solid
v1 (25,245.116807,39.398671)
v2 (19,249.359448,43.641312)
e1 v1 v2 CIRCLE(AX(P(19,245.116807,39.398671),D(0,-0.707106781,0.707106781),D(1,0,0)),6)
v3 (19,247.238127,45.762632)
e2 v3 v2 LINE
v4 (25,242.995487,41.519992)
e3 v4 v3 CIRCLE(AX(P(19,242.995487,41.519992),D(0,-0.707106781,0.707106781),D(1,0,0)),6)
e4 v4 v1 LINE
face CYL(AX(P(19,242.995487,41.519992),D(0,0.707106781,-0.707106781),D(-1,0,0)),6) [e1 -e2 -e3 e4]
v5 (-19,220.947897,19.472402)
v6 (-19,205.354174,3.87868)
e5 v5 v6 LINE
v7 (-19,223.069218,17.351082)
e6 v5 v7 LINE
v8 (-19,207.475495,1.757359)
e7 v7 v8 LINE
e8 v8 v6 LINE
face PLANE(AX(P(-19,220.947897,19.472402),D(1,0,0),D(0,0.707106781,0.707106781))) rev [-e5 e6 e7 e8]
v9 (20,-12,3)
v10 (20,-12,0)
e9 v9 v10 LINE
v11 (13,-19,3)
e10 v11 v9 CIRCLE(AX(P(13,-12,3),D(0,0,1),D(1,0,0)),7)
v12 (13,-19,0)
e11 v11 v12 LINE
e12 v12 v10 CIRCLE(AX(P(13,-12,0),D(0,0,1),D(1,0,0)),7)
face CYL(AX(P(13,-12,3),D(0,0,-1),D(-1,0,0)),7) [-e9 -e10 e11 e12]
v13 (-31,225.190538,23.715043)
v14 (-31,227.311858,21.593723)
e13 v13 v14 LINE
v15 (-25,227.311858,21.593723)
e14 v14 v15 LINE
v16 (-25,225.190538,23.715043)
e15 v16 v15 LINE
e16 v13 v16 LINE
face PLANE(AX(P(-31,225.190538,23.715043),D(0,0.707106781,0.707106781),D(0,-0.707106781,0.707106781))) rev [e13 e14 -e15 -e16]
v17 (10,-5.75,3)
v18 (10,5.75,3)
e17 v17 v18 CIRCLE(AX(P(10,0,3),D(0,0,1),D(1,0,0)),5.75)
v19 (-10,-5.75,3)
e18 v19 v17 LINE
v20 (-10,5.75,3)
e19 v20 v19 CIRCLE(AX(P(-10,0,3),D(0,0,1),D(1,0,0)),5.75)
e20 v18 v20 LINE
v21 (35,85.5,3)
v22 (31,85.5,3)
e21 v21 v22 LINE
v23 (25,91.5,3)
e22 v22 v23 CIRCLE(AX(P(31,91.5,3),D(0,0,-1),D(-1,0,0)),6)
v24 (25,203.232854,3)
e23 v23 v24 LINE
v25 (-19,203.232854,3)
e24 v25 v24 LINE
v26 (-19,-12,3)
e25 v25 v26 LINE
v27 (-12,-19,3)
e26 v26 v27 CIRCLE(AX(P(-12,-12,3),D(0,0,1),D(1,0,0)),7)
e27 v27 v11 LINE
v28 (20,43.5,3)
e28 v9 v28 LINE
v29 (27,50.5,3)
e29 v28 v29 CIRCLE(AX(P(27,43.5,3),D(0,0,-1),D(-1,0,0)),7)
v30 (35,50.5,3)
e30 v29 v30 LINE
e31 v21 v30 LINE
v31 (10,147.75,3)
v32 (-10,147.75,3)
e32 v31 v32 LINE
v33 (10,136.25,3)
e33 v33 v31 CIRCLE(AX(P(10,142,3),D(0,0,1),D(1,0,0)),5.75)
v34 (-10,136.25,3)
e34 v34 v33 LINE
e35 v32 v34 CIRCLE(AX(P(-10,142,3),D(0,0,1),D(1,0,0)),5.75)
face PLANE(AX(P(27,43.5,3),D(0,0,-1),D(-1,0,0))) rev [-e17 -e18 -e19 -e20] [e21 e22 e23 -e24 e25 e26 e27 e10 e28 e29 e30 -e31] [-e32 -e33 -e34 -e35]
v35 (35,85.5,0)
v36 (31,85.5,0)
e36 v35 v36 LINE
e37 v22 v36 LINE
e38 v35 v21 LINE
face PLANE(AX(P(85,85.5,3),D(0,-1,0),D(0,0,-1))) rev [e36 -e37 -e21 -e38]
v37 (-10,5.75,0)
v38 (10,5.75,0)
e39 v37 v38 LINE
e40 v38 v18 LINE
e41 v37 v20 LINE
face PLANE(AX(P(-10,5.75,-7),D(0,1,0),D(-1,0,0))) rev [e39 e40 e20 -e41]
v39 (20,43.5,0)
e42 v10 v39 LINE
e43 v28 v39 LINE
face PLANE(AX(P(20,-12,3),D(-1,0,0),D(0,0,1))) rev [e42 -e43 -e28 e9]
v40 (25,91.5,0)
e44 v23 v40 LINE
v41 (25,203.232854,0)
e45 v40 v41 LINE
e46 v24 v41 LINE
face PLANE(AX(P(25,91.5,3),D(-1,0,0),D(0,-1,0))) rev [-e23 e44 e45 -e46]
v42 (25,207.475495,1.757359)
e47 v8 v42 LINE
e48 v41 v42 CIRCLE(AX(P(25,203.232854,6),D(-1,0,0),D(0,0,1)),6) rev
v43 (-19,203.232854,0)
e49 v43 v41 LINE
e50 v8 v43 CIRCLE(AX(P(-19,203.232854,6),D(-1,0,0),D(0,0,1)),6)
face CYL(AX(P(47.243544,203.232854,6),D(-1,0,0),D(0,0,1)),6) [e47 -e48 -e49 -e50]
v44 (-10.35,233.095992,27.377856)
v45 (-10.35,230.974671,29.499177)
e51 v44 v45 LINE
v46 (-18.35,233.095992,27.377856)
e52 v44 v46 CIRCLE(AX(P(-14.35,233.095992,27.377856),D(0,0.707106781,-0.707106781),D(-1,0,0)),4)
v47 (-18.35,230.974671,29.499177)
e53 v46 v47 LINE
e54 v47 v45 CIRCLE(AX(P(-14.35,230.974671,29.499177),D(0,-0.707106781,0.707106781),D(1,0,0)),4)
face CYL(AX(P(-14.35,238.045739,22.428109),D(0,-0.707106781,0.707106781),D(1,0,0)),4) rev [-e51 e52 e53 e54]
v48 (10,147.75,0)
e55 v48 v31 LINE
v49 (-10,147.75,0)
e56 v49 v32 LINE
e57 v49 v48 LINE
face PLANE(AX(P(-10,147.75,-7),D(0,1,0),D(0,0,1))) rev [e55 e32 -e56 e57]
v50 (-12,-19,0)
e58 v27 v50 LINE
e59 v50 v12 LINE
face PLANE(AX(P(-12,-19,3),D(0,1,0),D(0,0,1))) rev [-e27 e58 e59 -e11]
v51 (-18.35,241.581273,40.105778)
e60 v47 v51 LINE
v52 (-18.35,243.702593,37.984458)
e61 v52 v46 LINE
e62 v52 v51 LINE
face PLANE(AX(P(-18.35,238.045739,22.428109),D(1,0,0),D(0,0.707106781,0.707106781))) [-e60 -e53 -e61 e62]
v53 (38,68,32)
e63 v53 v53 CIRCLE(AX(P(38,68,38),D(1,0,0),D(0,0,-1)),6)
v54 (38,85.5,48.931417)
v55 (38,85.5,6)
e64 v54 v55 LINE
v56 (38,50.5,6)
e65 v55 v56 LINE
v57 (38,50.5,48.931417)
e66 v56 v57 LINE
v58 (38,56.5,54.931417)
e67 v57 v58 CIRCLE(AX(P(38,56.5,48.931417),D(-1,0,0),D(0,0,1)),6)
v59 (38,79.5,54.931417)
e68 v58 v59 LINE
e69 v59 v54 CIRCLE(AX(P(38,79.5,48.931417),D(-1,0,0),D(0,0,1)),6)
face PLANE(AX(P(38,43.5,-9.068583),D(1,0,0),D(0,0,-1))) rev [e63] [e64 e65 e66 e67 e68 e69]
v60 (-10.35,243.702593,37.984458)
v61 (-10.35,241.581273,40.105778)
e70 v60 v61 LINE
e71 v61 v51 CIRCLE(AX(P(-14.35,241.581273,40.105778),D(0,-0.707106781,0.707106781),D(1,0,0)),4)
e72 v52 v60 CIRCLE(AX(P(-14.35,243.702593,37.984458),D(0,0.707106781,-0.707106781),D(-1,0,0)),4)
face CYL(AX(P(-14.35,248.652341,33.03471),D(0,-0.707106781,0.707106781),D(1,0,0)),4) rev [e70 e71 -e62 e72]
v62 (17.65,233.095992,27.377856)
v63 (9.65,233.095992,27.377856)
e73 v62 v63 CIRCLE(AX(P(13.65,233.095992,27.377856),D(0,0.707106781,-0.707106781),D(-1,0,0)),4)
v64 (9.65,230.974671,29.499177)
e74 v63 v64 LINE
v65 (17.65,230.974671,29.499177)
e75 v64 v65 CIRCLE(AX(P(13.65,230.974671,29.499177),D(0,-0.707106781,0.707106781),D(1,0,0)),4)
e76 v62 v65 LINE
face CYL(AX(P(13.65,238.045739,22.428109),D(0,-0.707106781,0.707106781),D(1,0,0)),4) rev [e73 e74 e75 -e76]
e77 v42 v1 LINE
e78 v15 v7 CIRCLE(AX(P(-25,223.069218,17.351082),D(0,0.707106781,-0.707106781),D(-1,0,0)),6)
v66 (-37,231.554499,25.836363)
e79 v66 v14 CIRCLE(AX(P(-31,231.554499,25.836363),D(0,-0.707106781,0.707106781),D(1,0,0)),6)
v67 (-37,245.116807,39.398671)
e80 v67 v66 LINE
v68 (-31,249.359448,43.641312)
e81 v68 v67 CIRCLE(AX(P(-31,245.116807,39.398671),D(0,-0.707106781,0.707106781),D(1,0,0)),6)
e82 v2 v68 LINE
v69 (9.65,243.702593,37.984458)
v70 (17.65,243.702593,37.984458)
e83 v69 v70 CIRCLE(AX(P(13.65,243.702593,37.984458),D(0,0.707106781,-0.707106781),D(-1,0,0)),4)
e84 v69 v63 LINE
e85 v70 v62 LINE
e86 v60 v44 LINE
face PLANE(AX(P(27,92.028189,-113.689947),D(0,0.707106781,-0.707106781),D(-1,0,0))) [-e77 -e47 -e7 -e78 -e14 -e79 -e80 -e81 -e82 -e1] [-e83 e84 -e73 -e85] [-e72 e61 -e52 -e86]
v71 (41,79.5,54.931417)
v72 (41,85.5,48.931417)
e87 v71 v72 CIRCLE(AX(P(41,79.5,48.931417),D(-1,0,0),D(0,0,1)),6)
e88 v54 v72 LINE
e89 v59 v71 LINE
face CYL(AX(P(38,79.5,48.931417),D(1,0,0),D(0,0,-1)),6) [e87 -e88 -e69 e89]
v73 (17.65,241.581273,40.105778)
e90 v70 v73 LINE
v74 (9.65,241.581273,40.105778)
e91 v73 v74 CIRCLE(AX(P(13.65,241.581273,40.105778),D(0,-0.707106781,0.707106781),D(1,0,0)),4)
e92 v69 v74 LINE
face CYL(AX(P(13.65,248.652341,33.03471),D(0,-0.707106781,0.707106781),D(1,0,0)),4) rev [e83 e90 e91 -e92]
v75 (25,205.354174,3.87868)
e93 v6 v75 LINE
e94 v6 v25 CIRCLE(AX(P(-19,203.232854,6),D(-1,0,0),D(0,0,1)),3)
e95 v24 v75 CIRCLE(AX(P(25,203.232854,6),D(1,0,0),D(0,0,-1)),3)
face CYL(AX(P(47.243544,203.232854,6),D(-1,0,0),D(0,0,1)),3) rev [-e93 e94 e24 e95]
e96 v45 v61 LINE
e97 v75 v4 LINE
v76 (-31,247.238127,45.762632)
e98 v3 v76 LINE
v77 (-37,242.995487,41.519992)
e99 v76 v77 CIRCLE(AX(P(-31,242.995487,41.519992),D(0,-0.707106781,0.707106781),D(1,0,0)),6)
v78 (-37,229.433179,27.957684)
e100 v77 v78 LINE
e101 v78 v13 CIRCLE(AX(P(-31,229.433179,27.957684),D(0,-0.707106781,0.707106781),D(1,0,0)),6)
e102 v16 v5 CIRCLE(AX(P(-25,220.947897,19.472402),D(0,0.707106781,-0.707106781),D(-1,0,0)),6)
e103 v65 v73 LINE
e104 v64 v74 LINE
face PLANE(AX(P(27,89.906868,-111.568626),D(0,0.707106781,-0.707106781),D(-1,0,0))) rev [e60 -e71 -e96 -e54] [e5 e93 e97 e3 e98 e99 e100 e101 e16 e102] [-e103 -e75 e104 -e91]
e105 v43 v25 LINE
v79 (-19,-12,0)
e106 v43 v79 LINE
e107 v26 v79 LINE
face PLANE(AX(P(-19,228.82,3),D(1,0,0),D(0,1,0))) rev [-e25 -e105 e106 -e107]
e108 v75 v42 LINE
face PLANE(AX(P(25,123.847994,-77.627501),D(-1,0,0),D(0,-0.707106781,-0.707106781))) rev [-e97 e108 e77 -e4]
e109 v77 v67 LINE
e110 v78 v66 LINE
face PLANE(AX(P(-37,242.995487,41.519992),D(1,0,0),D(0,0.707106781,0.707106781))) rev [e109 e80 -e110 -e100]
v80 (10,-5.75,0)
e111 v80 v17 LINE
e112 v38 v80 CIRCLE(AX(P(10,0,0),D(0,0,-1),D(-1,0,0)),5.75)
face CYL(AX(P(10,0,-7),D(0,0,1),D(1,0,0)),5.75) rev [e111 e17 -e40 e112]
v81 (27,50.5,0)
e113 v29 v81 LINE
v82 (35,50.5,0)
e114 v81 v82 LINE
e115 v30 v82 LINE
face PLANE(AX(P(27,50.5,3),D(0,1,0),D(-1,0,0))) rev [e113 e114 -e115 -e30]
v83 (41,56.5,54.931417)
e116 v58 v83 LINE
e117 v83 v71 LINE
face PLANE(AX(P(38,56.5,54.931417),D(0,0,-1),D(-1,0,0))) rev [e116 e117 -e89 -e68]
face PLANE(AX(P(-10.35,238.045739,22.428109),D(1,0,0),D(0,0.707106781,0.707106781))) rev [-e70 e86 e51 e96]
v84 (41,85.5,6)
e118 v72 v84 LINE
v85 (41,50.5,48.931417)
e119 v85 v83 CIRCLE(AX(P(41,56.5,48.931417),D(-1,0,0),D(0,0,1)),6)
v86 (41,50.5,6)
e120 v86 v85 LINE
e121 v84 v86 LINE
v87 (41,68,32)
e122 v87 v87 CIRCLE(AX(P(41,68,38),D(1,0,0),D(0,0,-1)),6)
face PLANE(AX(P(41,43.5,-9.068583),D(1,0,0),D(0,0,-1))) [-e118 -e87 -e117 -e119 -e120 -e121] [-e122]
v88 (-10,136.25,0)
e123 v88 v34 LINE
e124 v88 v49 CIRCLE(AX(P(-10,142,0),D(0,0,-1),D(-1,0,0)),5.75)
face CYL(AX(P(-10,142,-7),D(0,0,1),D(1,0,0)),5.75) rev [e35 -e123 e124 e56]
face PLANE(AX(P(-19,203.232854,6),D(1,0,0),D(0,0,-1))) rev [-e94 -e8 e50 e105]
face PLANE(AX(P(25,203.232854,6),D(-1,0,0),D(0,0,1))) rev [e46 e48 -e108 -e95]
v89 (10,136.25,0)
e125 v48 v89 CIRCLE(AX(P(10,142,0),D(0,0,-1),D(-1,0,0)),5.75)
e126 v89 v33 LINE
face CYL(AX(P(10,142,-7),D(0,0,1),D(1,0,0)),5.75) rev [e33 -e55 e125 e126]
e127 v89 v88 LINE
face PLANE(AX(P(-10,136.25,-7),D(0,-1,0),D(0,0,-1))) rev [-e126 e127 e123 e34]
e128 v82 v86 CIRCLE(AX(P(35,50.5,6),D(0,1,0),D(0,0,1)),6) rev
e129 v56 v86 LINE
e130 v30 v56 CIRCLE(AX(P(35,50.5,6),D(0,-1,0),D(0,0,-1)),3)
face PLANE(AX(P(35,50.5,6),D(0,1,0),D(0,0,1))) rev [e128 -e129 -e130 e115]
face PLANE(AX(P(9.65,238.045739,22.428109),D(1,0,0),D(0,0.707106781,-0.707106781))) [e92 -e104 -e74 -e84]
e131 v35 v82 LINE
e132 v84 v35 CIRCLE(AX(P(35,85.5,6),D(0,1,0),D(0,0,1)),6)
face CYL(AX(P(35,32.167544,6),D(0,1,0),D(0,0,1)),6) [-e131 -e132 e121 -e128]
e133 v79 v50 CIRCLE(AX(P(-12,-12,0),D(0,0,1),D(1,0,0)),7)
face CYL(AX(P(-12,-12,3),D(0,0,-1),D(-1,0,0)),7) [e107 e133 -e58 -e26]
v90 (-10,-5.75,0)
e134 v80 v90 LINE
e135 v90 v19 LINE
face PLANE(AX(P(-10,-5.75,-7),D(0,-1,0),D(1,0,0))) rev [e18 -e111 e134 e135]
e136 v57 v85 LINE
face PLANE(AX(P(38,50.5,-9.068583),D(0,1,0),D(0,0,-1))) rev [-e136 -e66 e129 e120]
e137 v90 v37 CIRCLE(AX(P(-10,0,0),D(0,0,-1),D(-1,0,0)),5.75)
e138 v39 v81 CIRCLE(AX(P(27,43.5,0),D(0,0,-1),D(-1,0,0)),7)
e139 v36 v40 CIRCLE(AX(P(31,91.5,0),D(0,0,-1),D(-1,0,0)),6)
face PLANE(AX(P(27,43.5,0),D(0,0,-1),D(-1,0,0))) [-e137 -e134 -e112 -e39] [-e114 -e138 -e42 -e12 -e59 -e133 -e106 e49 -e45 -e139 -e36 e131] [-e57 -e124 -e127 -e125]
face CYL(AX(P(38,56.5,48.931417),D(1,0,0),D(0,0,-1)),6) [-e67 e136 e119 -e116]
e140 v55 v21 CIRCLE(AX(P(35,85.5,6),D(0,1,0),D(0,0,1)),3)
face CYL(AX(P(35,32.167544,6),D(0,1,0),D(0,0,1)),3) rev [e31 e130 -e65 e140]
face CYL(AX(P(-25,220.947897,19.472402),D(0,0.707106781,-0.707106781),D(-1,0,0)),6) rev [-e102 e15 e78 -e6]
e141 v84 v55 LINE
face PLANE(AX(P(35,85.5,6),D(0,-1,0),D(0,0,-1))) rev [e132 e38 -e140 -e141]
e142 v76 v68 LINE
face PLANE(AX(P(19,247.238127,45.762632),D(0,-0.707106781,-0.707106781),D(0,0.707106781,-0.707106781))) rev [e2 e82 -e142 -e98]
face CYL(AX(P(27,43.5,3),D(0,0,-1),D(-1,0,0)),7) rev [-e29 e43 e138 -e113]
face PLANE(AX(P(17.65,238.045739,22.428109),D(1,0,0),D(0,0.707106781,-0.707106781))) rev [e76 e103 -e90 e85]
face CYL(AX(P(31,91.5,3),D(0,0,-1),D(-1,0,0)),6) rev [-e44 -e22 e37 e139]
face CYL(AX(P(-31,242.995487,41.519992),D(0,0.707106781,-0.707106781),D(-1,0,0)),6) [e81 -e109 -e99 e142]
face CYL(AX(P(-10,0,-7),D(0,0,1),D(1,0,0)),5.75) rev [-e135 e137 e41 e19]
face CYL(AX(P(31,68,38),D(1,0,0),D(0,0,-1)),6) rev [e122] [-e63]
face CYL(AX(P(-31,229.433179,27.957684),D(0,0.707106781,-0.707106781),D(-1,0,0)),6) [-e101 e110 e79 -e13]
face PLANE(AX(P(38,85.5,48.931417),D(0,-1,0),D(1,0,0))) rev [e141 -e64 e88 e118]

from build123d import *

# Parameters (mm, degrees)
BASE_FLANGE1_DEPTH     = 3
CUT_EXTRUDE1_DEPTH     = 10
SKETCHED_START         = 179.903820644
SKETCHED_BEND1_DEPTH   = 9.096179356
SKETCHED_START_2       = -37
SKETCHED_BEND1_2_DEPTH = 62
SKETCHED_START_3       = -19
SKETCHED_BEND1_3_DEPTH = 44
SKETCHED_START_4       = -10.35
SKETCHED_BEND1_4_DEPTH = 20
SKETCHED_START_5       = -31
SKETCHED_BEND1_5_DEPTH = 12.65
SKETCHED_START_6       = 17.65
SKETCHED_BEND1_6_DEPTH = 1.35
SKETCHED_START_7       = 142.46468863
SKETCHED_BEND1_7_DEPTH = 2.999999999
SKETCHED_START_8       = 50.5
SKETCHED_BEND2_DEPTH   = 35
SKETCHED_BEND2_2_DEPTH = 35
SKETCHED_START_9       = 31
SKETCHED_BEND2_3_DEPTH = 11
SKETCH9_R              = 6
CUT_EXTRUDE2_DEPTH     = 10
CUT_EXTRUDE3_DEPTH     = 10


with BuildPart() as part:
    # Base-Flange1: sheet metal written as solids
    # Sketch1 → Base-Flange1 (new body)
    with BuildSketch(Plane(origin=(0, 0, 0), x_dir=(0, 1, 0), z_dir=(0, 0, 1))):
        with BuildLine():
            Line((-19, 12), (-19, -13))
            ThreePointArc((-19, -13), (-16.949747468, -17.949747468), (-12, -20))
            Line((-12, -20), (43.5, -20))
            ThreePointArc((43.5, -20), (48.449747468, -22.050252532), (50.5, -27))
            Line((50.5, -27), (50.5, -85))
            ThreePointArc((50.5, -85), (52.257359313, -89.242640687), (56.5, -91))
            Line((56.5, -91), (79.5, -91))
            ThreePointArc((79.5, -91), (83.742640687, -89.242640687), (85.5, -85))
            Line((85.5, -85), (85.5, -31))
            ThreePointArc((85.5, -31), (87.257359313, -26.757359313), (91.5, -25))
            Line((91.5, -25), (260, -25))
            ThreePointArc((260, -25), (264.242640687, -23.242640687), (266, -19))
            Line((266, -19), (266, 31))
            ThreePointArc((266, 31), (264.242640687, 35.242640687), (260, 37))
            Line((260, 37), (240.82, 37))
            ThreePointArc((240.82, 37), (236.577359313, 35.242640687), (234.82, 31))
            Line((234.82, 31), (234.82, 25))
            ThreePointArc((234.82, 25), (233.062640687, 20.757359313), (228.82, 19))
            Line((228.82, 19), (-12, 19))
            ThreePointArc((-12, 19), (-16.949747468, 16.949747468), (-19, 12))
        make_face()
    extrude(amount=BASE_FLANGE1_DEPTH)

    # Sketch6 → Cut-Extrude1 (cut)
    with BuildSketch(Plane.XY.offset(3)):
        with BuildLine():
            Line((9.65, 243), (9.65, 258))
            ThreePointArc((9.65, 258), (13.65, 262), (17.65, 258))
            Line((17.65, 258), (17.65, 243))
            ThreePointArc((17.65, 243), (13.65, 239), (9.65, 243))
        make_face()
        with BuildLine():
            Line((-18.35, 243), (-18.35, 258))
            ThreePointArc((-18.35, 258), (-14.35, 262), (-10.35, 258))
            Line((-10.35, 258), (-10.35, 243))
            ThreePointArc((-10.35, 243), (-14.35, 239), (-18.35, 243))
        make_face()
    extrude(amount=-CUT_EXTRUDE1_DEPTH, mode=Mode.SUBTRACT)

    # Sketched Bend1: read off the stored shape, not the designer's step
    # Sketched Bend1 outline → Sketched Bend1 (cut)
    with BuildSketch(Plane(origin=(0, 0, 0), x_dir=(1, 0, 0), z_dir=(0, 0.707106781186549, -0.707106781186546)).offset(SKETCHED_START)):
        with BuildLine():
            Line((9.65, -184.182824136), (9.65, -199.182824136))
            ThreePointArc((9.65, -199.182824136), (13.65, -203.182824136), (17.65, -199.182824136))
            Line((17.65, -199.182824136), (17.65, -184.182824136))
            ThreePointArc((17.65, -184.182824136), (13.65, -180.182824136), (9.65, -184.182824136))
        make_face()
        with BuildLine():
            Line((-18.35, -184.182824136), (-18.35, -199.182824136))
            ThreePointArc((-18.35, -199.182824136), (-14.35, -203.182824136), (-10.35, -199.182824136))
            Line((-10.35, -199.182824136), (-10.35, -184.182824136))
            ThreePointArc((-10.35, -184.182824136), (-14.35, -180.182824136), (-18.35, -184.182824136))
        make_face()
    extrude(amount=SKETCHED_BEND1_DEPTH, mode=Mode.SUBTRACT)

    # Sketched Bend1 2 outline → Sketched Bend1 2 (cut)
    with BuildSketch(Plane.YZ.offset(SKETCHED_START_2)):
        with BuildLine():
            Line((208.718135506, 3), (207.475494819, 1.757359313))
            ThreePointArc((207.475494819, 1.757359313), (205.528954726, 0.456722805), (203.232854132, 0))
            Line((203.232854132, 0), (266, 0))
            Line((266, 0), (266, 3))
            Line((266, 3), (208.718135506, 3))
        make_face()
    extrude(amount=SKETCHED_BEND1_2_DEPTH, mode=Mode.SUBTRACT)

    # Sketched Bend1 3 outline → Sketched Bend1 3 (add)
    with BuildSketch(Plane.YZ.offset(SKETCHED_START_3)):
        with BuildLine():
            Line((225.190537865, 23.715043045), (205.354174476, 3.878679656))
            ThreePointArc((205.354174476, 3.878679656), (204.380904429, 3.228361402), (203.232854132, 3))
            Line((203.232854132, 3), (208.718135506, 3))
            Line((208.718135506, 3), (227.311858208, 21.593722702))
            Line((227.311858208, 21.593722702), (225.190537865, 23.715043045))
        make_face()
    extrude(amount=SKETCHED_BEND1_3_DEPTH)

    # Sketched Bend1 4 outline → Sketched Bend1 4 (add)
    with BuildSketch(Plane.YZ.offset(SKETCHED_START_4)):
        Polygon((247.238127302, 45.762632482), (225.190537865, 23.715043045), (227.311858208, 21.593722702), (249.359447645, 43.641312139), align=None)
    extrude(amount=SKETCHED_BEND1_4_DEPTH)

    # Sketched Bend1 5 outline → Sketched Bend1 5 (add)
    with BuildSketch(Plane.YZ.offset(SKETCHED_START_5)):
        Polygon((247.238127302, 45.762632482), (225.190537865, 23.715043045), (227.311858208, 21.593722702), (249.359447645, 43.641312139), align=None)
    extrude(amount=SKETCHED_BEND1_5_DEPTH)

    # Sketched Bend1 6 outline → Sketched Bend1 6 (add)
    with BuildSketch(Plane.YZ.offset(SKETCHED_START_6)):
        Polygon((247.238127302, 45.762632482), (225.190537865, 23.715043045), (227.311858208, 21.593722702), (249.359447645, 43.641312139), align=None)
    extrude(amount=SKETCHED_BEND1_6_DEPTH)

    # Sketched Bend1 7 outline → Sketched Bend1 7 (add)
    with BuildSketch(Plane(origin=(0, 0, 0), x_dir=(1, 0, 0), z_dir=(0, 0.707106781186549, -0.707106781186546)).offset(SKETCHED_START_7)):
        with BuildLine():
            ThreePointArc((-19, -170.002824136), (-20.757359313, -174.245464823), (-25, -176.002824136))
            Line((-25, -176.002824136), (-19, -176.002824137))
            Line((-19, -176.002824137), (-19, -170.002824136))
        make_face()
        with BuildLine():
            ThreePointArc((-37, -201.182824136), (-35.242640687, -205.425464823), (-31, -207.182824136))
            Line((-31, -207.182824136), (-31, -176.002824136))
            ThreePointArc((-31, -176.002824136), (-35.242640687, -177.760183449), (-37, -182.002824136))
            Line((-37, -182.002824136), (-37, -201.182824136))
        make_face()
        with BuildLine():
            Line((-18.35, -207.182824136), (-10.35, -207.182824136))
            Line((-10.35, -207.182824136), (-10.35, -199.182824136))
            ThreePointArc((-10.35, -199.182824136), (-14.35, -203.182824136), (-18.35, -199.182824136))
            Line((-18.35, -199.182824136), (-18.35, -207.182824136))
        make_face()
        with BuildLine():
            Line((9.65, -207.182824136), (17.65, -207.182824136))
            Line((17.65, -207.182824136), (17.65, -199.182824136))
            ThreePointArc((17.65, -199.182824136), (13.65, -203.182824136), (9.65, -199.182824136))
            Line((9.65, -199.182824136), (9.65, -207.182824136))
        make_face()
        with BuildLine():
            Line((25, -201.182824136), (25, -176.002824137))
            Line((25, -176.002824137), (19, -176.002824137))
            Line((19, -176.002824137), (19, -207.182824136))
            ThreePointArc((19, -207.182824136), (23.242640687, -205.425464823), (25, -201.182824136))
        make_face()
        with BuildLine():
            ThreePointArc((9.65, -184.182824136), (13.65, -180.182824136), (17.65, -184.182824136))
            Line((17.65, -184.182824136), (17.65, -176.002824137))
            Line((17.65, -176.002824137), (9.65, -176.002824137))
            Line((9.65, -176.002824137), (9.65, -184.182824136))
        make_face()
        with BuildLine():
            ThreePointArc((-18.35, -184.182824136), (-14.35, -180.182824136), (-10.35, -184.182824136))
            Line((-10.35, -184.182824136), (-10.35, -176.002824137))
            Line((-10.35, -176.002824137), (-18.35, -176.002824137))
            Line((-18.35, -176.002824137), (-18.35, -184.182824136))
        make_face()
    extrude(amount=SKETCHED_BEND1_7_DEPTH)

    # Sketched Bend2: read off the stored shape, not the designer's step
    # Sketched Bend2 outline → Sketched Bend2 (cut)
    with BuildSketch(Plane(origin=(0, 0, 0), x_dir=(1, 0, 0), z_dir=(0, 1, 0)).offset(SKETCHED_START_8)):
        with BuildLine():
            ThreePointArc((35, 0), (38, -0.803847577), (40.196152423, -3))
            Line((40.196152423, -3), (91, -3))
            Line((91, -3), (91, 0))
            Line((91, 0), (35, 0))
        make_face()
    extrude(amount=SKETCHED_BEND2_DEPTH, mode=Mode.SUBTRACT)

    # Sketched Bend2 2 outline → Sketched Bend2 2 (add)
    with BuildSketch(Plane(origin=(0, 0, 0), x_dir=(1, 0, 0), z_dir=(0, 1, 0)).offset(SKETCHED_START_8)):
        with BuildLine():
            ThreePointArc((35, -3), (37.121320344, -3.878679656), (38, -6))
            Line((38, -6), (38, -54.931416529))
            Line((38, -54.931416529), (41, -54.931416529))
            Line((41, -54.931416529), (41, -6))
            ThreePointArc((41, -6), (40.795554958, -4.447085729), (40.196152423, -3))
            Line((40.196152423, -3), (35, -3))
        make_face()
    extrude(amount=SKETCHED_BEND2_2_DEPTH)

    # Sketched Bend2 3 outline → Sketched Bend2 3 (cut)
    with BuildSketch(Plane.YZ.offset(SKETCHED_START_9)):
        with BuildLine():
            ThreePointArc((50.5, 48.931416529), (52.257359313, 53.174057216), (56.5, 54.931416529))
            Line((56.5, 54.931416529), (50.5, 54.931416529))
            Line((50.5, 54.931416529), (50.5, 48.931416529))
        make_face()
        with BuildLine():
            ThreePointArc((79.5, 54.931416529), (83.742640687, 53.174057217), (85.5, 48.931416529))
            Line((85.5, 48.931416529), (85.5, 54.931416529))
            Line((85.5, 54.931416529), (79.5, 54.931416529))
        make_face()
    extrude(amount=SKETCHED_BEND2_3_DEPTH, mode=Mode.SUBTRACT)

    # Sketch9 → Cut-Extrude2 (cut)
    with BuildSketch(Plane.YZ.offset(41)):
        with Locations(Location((68, 38, 0), (0, 0, 270))):
            Circle(SKETCH9_R)
    extrude(amount=-CUT_EXTRUDE2_DEPTH, mode=Mode.SUBTRACT)

    # Sketch10 → Cut-Extrude3 (cut)
    with BuildSketch(Plane.XY.offset(3)):
        with BuildLine():
            Line((-10, 5.75), (10, 5.75))
            ThreePointArc((10, 5.75), (15.75, 0), (10, -5.75))
            Line((10, -5.75), (-10, -5.75))
            ThreePointArc((-10, -5.75), (-15.75, 0), (-10, 5.75))
        make_face()
        with BuildLine():
            Line((-10, 147.75), (10, 147.75))
            ThreePointArc((10, 147.75), (15.75, 142), (10, 136.25))
            Line((10, 136.25), (-10, 136.25))
            ThreePointArc((-10, 136.25), (-15.75, 142), (-10, 147.75))
        make_face()
    extrude(amount=-CUT_EXTRUDE3_DEPTH, mode=Mode.SUBTRACT)


solid = part.part
